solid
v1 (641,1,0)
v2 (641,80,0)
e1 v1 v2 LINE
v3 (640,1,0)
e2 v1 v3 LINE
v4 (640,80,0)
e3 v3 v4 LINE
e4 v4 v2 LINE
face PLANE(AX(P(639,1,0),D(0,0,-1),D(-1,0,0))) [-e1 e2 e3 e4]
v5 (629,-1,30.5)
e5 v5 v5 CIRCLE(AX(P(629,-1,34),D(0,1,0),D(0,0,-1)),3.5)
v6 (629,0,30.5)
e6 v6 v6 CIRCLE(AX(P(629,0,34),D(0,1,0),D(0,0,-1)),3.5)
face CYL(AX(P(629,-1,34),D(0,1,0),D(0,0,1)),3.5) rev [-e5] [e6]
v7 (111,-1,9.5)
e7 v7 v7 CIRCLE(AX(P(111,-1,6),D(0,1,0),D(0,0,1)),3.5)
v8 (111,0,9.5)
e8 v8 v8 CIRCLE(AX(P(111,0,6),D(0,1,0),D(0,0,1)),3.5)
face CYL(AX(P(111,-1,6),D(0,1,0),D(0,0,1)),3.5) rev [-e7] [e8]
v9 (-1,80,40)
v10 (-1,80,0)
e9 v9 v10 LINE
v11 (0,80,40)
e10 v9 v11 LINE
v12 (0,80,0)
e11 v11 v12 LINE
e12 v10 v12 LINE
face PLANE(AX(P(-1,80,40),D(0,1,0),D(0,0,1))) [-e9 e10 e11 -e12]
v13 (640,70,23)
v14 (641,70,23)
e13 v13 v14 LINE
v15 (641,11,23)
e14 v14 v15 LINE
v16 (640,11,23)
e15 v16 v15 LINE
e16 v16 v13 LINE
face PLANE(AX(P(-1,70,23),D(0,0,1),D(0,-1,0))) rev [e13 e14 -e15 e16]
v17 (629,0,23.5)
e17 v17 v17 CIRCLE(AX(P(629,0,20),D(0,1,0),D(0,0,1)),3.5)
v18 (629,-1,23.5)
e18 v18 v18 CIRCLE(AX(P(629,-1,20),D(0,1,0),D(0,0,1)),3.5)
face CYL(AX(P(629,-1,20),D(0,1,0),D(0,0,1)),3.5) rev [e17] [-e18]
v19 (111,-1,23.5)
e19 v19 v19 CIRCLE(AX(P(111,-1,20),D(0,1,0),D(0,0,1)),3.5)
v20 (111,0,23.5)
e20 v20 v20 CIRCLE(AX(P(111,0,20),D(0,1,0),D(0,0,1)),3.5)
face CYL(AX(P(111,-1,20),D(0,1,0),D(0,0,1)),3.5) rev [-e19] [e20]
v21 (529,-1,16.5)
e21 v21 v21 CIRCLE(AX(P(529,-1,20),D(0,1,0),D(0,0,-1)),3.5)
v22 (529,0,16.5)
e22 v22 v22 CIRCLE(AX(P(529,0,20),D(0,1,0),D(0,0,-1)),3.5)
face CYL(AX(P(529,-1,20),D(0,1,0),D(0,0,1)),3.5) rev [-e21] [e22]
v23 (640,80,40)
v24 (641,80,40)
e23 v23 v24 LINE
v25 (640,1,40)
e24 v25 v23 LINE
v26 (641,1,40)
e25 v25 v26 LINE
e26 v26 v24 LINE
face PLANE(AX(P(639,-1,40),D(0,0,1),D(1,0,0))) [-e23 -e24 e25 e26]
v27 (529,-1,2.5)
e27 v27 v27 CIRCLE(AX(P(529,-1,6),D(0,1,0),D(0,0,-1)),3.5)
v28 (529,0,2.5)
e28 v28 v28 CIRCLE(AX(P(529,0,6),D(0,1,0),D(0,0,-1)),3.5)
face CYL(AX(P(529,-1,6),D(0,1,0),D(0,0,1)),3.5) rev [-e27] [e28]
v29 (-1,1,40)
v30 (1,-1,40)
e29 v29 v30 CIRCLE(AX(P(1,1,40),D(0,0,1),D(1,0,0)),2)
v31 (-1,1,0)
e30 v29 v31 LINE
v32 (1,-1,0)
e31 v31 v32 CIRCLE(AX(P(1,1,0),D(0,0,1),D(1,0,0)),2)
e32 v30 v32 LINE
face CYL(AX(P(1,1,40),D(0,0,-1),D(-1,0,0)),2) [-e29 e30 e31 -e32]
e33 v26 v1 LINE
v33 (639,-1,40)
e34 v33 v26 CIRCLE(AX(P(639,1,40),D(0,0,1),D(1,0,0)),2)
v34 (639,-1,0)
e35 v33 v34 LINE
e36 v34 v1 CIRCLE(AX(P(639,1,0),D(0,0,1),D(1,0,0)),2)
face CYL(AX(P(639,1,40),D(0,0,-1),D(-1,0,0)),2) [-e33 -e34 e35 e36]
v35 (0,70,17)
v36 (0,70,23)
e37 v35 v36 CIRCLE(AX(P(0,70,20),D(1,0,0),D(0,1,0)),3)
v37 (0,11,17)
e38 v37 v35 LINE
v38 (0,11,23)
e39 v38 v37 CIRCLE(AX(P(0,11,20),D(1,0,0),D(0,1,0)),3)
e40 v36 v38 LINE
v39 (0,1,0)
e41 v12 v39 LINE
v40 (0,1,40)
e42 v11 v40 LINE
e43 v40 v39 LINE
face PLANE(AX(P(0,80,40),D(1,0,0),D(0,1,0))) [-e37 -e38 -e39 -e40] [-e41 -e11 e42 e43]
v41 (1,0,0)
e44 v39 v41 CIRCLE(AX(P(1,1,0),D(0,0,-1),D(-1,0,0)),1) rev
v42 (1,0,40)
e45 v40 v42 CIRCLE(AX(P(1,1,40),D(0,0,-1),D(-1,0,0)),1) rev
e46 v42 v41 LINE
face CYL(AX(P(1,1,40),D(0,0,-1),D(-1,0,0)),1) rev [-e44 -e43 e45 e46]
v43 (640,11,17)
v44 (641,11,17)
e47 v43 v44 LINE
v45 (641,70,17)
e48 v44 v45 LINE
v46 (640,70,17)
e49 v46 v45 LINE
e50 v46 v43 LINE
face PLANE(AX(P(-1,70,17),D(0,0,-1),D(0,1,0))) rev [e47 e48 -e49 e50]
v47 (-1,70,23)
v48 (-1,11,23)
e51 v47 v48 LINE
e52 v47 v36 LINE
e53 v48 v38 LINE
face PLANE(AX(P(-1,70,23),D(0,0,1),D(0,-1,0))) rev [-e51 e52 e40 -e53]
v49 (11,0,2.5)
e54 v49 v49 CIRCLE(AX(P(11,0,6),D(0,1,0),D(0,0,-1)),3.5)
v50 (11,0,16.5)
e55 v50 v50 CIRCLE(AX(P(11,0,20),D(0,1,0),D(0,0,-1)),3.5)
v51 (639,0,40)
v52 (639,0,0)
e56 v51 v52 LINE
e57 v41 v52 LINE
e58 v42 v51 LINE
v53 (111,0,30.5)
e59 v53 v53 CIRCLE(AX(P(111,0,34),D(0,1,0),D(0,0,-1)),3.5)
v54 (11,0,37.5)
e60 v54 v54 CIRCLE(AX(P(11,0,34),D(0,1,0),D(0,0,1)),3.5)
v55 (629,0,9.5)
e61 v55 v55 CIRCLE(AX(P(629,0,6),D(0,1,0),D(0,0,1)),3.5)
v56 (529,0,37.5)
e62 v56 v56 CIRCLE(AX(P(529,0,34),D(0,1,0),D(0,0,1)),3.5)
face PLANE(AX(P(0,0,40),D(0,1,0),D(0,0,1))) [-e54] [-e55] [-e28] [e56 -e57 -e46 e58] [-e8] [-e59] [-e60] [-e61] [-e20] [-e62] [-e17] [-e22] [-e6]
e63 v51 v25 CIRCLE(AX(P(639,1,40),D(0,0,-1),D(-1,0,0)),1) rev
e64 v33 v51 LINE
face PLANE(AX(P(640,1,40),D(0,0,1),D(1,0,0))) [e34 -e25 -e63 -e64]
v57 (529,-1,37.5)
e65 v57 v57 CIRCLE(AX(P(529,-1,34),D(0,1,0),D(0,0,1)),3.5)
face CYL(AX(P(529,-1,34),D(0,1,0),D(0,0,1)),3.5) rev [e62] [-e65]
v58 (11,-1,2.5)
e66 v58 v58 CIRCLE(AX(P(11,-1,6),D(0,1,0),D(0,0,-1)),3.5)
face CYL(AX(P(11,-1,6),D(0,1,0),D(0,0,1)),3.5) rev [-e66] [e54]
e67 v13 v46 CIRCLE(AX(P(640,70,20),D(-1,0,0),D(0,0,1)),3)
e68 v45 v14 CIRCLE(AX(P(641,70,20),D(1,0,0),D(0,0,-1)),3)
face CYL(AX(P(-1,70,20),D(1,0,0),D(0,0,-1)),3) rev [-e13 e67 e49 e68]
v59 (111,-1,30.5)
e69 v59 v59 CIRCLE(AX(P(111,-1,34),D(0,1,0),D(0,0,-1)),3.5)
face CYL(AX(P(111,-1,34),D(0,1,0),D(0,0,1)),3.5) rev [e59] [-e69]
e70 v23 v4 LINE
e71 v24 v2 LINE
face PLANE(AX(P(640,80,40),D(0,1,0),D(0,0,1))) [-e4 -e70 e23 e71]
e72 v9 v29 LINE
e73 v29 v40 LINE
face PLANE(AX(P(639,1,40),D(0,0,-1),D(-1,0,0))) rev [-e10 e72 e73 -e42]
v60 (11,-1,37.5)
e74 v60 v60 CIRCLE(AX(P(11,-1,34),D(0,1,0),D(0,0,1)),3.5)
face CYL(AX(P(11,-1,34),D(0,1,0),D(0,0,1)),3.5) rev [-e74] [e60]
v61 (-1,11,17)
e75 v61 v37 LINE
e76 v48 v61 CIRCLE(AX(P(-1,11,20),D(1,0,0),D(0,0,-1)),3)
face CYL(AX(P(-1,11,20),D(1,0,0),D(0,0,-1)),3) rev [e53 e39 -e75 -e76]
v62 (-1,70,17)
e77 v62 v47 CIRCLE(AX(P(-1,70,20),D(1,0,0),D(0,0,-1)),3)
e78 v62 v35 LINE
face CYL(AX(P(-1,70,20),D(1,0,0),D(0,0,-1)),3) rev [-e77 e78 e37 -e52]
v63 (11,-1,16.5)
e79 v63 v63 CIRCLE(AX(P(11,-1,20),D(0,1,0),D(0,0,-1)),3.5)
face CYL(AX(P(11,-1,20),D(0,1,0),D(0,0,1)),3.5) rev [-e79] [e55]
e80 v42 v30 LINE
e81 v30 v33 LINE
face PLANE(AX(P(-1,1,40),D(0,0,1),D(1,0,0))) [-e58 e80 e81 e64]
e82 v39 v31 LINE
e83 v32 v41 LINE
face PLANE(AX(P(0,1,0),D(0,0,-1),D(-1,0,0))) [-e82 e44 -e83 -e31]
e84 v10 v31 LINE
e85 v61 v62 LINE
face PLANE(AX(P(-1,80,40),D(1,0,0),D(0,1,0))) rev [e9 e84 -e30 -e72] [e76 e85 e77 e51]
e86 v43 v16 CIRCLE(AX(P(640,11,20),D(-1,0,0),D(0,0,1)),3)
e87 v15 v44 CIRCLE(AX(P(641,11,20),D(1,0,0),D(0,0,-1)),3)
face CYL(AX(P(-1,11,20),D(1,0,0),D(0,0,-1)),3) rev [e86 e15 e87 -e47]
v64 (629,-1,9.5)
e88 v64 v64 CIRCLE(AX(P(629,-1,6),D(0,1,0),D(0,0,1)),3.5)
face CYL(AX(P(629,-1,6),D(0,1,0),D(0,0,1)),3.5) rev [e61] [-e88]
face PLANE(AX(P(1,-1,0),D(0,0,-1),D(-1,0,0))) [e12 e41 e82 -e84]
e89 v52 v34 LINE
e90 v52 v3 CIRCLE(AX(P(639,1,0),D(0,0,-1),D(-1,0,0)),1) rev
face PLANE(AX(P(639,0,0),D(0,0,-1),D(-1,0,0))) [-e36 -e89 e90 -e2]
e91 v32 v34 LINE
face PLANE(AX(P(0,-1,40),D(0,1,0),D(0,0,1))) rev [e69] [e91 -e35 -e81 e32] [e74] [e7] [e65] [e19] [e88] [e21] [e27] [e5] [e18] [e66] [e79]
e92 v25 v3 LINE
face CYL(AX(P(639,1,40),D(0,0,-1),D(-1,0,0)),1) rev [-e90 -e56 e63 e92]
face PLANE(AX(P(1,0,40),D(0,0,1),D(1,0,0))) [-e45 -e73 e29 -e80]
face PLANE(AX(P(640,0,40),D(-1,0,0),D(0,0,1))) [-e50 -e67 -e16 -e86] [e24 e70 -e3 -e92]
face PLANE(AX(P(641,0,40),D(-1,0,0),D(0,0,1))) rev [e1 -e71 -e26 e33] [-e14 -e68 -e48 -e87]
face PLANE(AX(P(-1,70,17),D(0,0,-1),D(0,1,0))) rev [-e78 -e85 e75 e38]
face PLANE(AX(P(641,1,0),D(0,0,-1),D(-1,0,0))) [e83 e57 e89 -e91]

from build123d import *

# Parameters (mm, degrees)
BASE_FLANGE1_DEPTH = 40
CUT_EXTRUDE1_DEPTH = 649.200586239
SKETCH7_R          = 3.5
CUT_EXTRUDE2_DEPTH = 648.210166793


# Sheet-metal steps are written as plain solids
with BuildPart() as part:
    # Sketch1 → Base-Flange1 (new body)
    with BuildSketch(Plane.XY):
        with BuildLine():
            Line((0, 80), (0, 1))
            ThreePointArc((0, 1), (0.292893219, 0.292893219), (1, 0))
            Line((1, 0), (639, 0))
            ThreePointArc((639, 0), (639.707106781, 0.292893219), (640, 1))
            Line((640, 1), (640, 80))
            Line((640, 80), (641, 80))
            Line((641, 80), (641, 1))
            ThreePointArc((641, 1), (640.414213562, -0.414213562), (639, -1))
            Line((639, -1), (1, -1))
            ThreePointArc((1, -1), (-0.414213562, -0.414213562), (-1, 1))
            Line((-1, 1), (-1, 80))
            Line((-1, 80), (0, 80))
        make_face()
    extrude(amount=BASE_FLANGE1_DEPTH)

    # Sketch6 → Cut-Extrude1 (cut, through all)
    with BuildSketch(Plane(origin=(641, 0, 0), x_dir=(0, 0, -1), z_dir=(1, 0, 0))):
        with BuildLine():
            Line((-17, 70), (-17, 11))
            ThreePointArc((-17, 11), (-20, 8), (-23, 11))
            Line((-23, 11), (-23, 70))
            ThreePointArc((-23, 70), (-20, 73), (-17, 70))
        make_face()
    extrude(amount=-CUT_EXTRUDE1_DEPTH, mode=Mode.SUBTRACT)

    # Sketch7 → Cut-Extrude2 (cut, through all)
    with BuildSketch(Plane(origin=(0, 0, 0), x_dir=(1, 0, 0), z_dir=(0, 1, 0))):
        with Locations(Location((629, -20, 0), (0, 0, 270))):
            Circle(SKETCH7_R)
        with Locations(Location((629, -6, 0), (0, 0, 270))):
            Circle(SKETCH7_R)
        with Locations(Location((11, -20, 0), (0, 0, 90))):
            Circle(SKETCH7_R)
        with Locations(Location((11, -6, 0), (0, 0, 90))):
            Circle(SKETCH7_R)
        with Locations(Location((11, -34, 0), (0, 0, 270))):
            Circle(SKETCH7_R)
        with Locations(Location((629, -34, 0), (0, 0, 90))):
            Circle(SKETCH7_R)
        with Locations(Location((111, -34, 0), (0, 0, 90))):
            Circle(SKETCH7_R)
        with Locations(Location((111, -20, 0), (0, 0, 270))):
            Circle(SKETCH7_R)
        with Locations(Location((111, -6, 0), (0, 0, 270))):
            Circle(SKETCH7_R)
        with Locations(Location((529, -20, 0), (0, 0, 90))):
            Circle(SKETCH7_R)
        with Locations(Location((529, -34, 0), (0, 0, 270))):
            Circle(SKETCH7_R)
        with Locations(Location((529, -6, 0), (0, 0, 90))):
            Circle(SKETCH7_R)
    extrude(amount=-CUT_EXTRUDE2_DEPTH, mode=Mode.SUBTRACT)


solid = part.part
